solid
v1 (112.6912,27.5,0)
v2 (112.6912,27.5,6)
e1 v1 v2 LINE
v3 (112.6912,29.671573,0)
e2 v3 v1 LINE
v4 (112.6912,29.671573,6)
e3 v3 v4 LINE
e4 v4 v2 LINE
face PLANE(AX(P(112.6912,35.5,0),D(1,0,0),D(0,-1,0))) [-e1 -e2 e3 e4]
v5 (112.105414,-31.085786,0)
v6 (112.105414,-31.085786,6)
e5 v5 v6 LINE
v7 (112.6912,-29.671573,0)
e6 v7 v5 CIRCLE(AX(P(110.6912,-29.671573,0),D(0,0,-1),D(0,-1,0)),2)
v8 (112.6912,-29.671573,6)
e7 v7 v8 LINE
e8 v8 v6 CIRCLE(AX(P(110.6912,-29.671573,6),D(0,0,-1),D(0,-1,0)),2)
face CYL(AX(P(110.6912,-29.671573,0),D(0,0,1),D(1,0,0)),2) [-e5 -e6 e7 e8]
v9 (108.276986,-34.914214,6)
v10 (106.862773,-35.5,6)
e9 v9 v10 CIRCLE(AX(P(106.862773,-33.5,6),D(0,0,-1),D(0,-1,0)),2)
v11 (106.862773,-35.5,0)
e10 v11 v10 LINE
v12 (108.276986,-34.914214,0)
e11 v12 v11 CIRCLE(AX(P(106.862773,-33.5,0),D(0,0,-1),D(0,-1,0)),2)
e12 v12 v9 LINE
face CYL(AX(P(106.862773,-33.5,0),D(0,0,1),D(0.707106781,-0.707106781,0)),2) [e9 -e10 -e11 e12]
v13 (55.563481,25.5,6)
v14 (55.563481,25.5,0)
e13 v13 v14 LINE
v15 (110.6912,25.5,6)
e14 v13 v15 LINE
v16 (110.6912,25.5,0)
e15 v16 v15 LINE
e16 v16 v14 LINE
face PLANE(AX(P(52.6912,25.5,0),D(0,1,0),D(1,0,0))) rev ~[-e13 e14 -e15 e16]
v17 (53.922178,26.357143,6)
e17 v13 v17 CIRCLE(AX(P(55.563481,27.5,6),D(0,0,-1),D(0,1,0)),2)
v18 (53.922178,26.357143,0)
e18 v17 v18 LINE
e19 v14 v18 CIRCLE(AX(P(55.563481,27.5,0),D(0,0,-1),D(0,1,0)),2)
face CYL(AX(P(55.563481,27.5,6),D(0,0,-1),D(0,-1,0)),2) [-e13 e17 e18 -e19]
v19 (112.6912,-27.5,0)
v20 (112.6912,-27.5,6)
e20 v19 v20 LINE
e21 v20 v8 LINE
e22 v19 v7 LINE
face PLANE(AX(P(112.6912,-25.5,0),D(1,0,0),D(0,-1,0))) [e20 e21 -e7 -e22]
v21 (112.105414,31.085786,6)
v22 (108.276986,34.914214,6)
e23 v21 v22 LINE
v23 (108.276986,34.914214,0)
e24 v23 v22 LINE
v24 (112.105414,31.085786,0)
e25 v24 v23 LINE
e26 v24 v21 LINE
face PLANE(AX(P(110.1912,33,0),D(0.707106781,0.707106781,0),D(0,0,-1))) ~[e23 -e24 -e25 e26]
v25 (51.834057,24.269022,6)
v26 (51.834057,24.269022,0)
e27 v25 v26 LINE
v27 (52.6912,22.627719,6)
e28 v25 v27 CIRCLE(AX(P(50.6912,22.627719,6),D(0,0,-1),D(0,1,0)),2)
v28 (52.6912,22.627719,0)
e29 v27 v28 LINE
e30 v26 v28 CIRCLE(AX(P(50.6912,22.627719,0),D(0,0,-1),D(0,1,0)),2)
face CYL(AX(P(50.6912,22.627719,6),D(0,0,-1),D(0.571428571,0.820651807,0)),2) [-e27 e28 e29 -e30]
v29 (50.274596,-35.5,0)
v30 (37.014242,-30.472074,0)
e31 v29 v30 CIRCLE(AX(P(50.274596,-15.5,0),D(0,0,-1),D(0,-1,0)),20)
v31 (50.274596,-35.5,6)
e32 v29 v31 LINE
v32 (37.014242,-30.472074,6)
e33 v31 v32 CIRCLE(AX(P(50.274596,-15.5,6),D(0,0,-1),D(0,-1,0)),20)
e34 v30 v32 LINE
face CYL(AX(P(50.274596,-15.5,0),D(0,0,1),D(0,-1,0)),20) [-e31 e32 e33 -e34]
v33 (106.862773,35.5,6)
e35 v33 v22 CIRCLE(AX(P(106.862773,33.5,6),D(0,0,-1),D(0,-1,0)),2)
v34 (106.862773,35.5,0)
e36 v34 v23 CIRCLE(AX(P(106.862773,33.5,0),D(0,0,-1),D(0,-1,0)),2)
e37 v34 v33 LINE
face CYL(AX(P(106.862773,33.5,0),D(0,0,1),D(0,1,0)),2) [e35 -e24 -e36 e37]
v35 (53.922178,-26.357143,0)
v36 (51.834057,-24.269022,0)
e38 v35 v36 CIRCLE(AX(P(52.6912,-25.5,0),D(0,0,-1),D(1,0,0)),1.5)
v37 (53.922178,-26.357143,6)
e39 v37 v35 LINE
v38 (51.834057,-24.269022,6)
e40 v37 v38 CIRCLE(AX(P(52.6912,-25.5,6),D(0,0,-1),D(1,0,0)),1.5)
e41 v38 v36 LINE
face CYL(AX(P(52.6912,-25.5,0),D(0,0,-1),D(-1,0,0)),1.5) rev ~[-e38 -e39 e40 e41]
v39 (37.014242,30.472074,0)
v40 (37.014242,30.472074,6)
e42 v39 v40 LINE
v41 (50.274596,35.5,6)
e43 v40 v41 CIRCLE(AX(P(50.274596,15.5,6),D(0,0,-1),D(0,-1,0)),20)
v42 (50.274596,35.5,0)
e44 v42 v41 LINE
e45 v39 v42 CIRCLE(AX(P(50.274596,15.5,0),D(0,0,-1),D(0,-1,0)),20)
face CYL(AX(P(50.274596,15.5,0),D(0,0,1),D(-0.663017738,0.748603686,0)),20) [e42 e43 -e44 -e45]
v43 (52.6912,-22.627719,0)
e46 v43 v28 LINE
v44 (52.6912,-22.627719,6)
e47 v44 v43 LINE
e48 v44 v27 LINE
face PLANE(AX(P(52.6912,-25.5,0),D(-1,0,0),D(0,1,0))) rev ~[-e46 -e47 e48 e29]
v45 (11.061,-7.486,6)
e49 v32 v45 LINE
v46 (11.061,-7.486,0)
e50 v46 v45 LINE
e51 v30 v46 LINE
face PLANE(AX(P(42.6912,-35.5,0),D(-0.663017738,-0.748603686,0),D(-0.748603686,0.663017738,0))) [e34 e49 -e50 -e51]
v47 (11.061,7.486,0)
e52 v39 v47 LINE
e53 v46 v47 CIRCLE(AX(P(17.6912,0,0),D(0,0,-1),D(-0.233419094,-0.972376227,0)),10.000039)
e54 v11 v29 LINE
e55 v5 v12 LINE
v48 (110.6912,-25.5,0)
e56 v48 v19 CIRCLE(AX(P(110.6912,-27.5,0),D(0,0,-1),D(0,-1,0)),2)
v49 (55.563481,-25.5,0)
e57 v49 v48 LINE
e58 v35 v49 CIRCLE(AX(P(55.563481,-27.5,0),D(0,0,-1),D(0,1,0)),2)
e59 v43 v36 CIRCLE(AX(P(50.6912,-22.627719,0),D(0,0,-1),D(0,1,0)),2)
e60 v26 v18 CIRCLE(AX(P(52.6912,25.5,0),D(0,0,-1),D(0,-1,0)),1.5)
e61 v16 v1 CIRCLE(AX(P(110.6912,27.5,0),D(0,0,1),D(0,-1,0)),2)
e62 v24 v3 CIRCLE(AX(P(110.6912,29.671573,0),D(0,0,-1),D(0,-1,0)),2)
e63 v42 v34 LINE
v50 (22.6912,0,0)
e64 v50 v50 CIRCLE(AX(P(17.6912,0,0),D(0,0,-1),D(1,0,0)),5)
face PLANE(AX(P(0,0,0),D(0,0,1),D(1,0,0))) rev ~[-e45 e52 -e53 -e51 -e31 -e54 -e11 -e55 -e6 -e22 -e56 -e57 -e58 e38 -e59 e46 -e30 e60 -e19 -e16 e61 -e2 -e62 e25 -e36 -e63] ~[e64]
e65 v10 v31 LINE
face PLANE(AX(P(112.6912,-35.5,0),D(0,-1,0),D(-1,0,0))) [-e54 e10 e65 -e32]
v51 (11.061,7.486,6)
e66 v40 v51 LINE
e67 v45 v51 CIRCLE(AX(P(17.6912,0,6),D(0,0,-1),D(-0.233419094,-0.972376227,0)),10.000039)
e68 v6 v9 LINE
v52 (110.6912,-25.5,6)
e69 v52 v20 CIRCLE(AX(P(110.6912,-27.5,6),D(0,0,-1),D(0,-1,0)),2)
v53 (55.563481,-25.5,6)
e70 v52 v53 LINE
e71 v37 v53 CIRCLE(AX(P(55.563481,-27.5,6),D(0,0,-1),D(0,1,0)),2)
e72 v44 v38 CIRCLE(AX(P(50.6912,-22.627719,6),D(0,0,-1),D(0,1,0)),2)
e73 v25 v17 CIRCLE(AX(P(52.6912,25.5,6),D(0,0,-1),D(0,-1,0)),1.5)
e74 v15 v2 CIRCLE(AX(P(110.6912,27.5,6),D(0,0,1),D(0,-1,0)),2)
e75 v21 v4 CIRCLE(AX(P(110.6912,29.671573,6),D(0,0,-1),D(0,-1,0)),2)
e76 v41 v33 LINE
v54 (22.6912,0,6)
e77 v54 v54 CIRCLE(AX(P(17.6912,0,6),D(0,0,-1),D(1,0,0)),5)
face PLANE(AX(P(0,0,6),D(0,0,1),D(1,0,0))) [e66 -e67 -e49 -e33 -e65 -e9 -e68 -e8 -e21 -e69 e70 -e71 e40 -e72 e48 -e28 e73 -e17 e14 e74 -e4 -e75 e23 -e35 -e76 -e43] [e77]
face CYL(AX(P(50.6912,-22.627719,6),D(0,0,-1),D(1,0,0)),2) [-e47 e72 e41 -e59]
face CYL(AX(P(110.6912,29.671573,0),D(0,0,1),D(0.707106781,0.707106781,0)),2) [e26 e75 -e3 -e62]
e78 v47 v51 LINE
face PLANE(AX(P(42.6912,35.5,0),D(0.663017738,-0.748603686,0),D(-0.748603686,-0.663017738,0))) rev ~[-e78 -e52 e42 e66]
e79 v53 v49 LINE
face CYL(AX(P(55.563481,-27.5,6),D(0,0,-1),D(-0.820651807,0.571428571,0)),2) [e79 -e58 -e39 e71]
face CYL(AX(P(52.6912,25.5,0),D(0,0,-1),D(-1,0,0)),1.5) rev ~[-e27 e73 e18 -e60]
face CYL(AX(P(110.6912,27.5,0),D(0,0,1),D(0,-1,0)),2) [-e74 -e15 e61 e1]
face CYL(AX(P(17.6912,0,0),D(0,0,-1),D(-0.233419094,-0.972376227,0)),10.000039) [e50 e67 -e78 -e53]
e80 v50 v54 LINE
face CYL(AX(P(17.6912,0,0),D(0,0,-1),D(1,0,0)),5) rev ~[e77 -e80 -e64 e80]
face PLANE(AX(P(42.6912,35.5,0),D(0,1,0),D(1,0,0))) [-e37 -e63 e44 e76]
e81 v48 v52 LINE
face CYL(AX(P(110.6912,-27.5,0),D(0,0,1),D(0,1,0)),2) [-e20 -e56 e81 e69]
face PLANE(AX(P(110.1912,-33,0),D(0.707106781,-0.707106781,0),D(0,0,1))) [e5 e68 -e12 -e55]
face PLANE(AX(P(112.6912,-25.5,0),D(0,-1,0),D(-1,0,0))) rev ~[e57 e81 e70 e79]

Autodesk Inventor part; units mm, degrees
ref_plane "YZ Plane" through (0, 0, 0) normal (1, 0, 0) x (0, 1, 0)
ref_plane "XZ Plane" through (0, 0, 0) normal (0, 1, 0) x (-1, 0, 0)
ref_plane "XY Plane" through (0, 0, 0) normal (0, 0, 1) x (1, 0, 0)
sketch "Sketch1" plane through (0, 0, 0) normal (0, 0, 1) x (1, 0, 0)
  circle A0 centre (-790.1228, -10.9134) radius 9.525 projected
  ellipse E0 centre (61.5218, 18.65) end of major axis (52.5416, 18.65) minor radius 6.35 (61.5218, 25) -> (52.5416, 18.65) ccw
  line L0 (61.5218, 25) -> (114.272, 25)
  ellipse E1 centre (114.272, 18.65) end of major axis (105.2917, 18.65) minor radius 6.35 (123.2522, 18.65) -> (114.272, 25) ccw
  line L1 (123.2522, 18.65) -> (123.2522, -18.65)
  ellipse E2 centre (114.272, -18.65) end of major axis (105.2917, -18.65) minor radius 6.35 (114.272, -25) -> (123.2522, -18.65) ccw
  line L2 (114.272, -25) -> (61.5218, -25)
  ellipse E3 centre (61.5218, -18.65) end of major axis (52.5416, -18.65) minor radius 6.35 (52.5416, -18.65) -> (61.5218, -25) ccw
  line L3 (52.5416, -18.65) -> (52.5416, 18.65)
  line L4 (114.272, 21.825) -> (61.5218, 21.825)
  ellipse E4 centre (61.5218, 18.65) end of major axis (57.0317, 18.65) minor radius 3.175 (61.5218, 21.825) -> (57.0317, 18.65) ccw
  line L5 (57.0317, 18.65) -> (57.0317, -18.65)
  ellipse E5 centre (61.5218, -18.65) end of major axis (57.0317, -18.65) minor radius 3.175 (57.0317, -18.65) -> (61.5218, -21.825) ccw
  line L6 (61.5218, -21.825) -> (114.272, -21.825)
  ellipse E6 centre (114.272, -18.65) end of major axis (109.7818, -18.65) minor radius 3.175 (114.272, -21.825) -> (118.7621, -18.65) ccw
  line L7 (118.7621, -18.65) -> (118.7621, 18.65)
  ellipse E7 centre (114.272, 18.65) end of major axis (109.7818, 18.65) minor radius 3.175 (118.7621, 18.65) -> (114.272, 21.825) ccw
  circle A1 centre (17.6912, 0) radius 5 projected
  circle A2 centre (17.6912, 0) radius 10
  line L8 (15.357, 9.7238) -> (52.5416, 18.65)
  line L9 (52.5416, -18.65) -> (15.357, -9.7238)
  dimension "d4" = 20
extrude "Extrusion1" add sketch "Sketch1" along normal blind 6 contours L3 L9 A2 L8 | A2
chamfer "Chamfer1" distance 5 angle 45 1 edges at (52.5416, 0, 6)
thicken "Thicken1" operation add thickness 3 both sides no extend neighbours yes toward (-0.7071068, 0, -0.7071068) faces at (50.8749, 5.8166, 2.6667)
sketch "Sketch2" plane through (0, 0, 0) normal (0, 0, -1) x (-1, 0, 0)
  line L0 (-49.2989, -17.8716) -> (-49.2989, 17.8716) projected
  line L1 (-15.357, -9.7238) -> (-49.2989, -17.8716) projected
  arc A0 (-15.357, -9.7238) -> (-15.357, 9.7238) centre (-17.6912, 0) ccw projected
  line L2 (-49.2989, 17.8716) -> (-15.357, 9.7238) projected
  circle A1 centre (-17.6912, 0) radius 5 projected
  line L3 (-112.6912, -35.5) -> (-42.6912, -35.5)
  line L4 (-42.6912, -35.5) -> (-42.6912, 35.5)
  line L5 (-42.6912, 35.5) -> (-112.6912, 35.5)
  line L6 (-112.6912, -35.5) -> (-42.6912, 35.5) construction
  line L7 (-42.6912, -35.5) -> (-112.6912, 35.5) construction
  line L8 (-42.6912, 35.5) -> (-11.061, 7.486)
  arc A2 (-15.357, -9.7238) -> (-15.357, 9.7238) centre (-17.6912, 0) ccw projected
  line L9 (-42.6912, -35.5) -> (-11.061, -7.486)
  line L10 (-102.6912, -25.5) -> (-52.6912, -25.5)
  line L11 (-52.6912, -25.5) -> (-52.6912, 25.5)
  line L12 (-52.6912, 25.5) -> (-102.6912, 25.5)
  line L13 (-102.6912, -25.5) -> (-52.6912, 25.5) construction
  line L14 (-52.6912, -25.5) -> (-102.6912, 25.5) construction
  line L15 (-102.6912, 25.5) -> (-112.6912, 25.5)
  line L16 (-112.6912, -25.5) -> (-102.6912, -25.5)
  line L17 (-112.6912, 35.5) -> (-112.6912, 25.5)
  line L18 (-112.6912, -25.5) -> (-112.6912, -35.5)
  line L19 (-49.2989, -17.8716) -> (-49.2989, 17.8716) projected
  point P0 (0, 0)
  point P1 (-77.6912, 0)
  point P2 (-49.2989, 0)
  point P3 (-77.6912, 0)
  point P4 (-11.061, -7.486)
  point P5 (-11.061, 7.486)
  point P6 (-49.2989, 0)
  point P7 (-52.6912, 0)
  dimension "d13" = 51
  dimension "d14" = 35
  dimension "d15" = 10
  dimension "d16" = 50
  dimension "d17" = 10
  dimension "d30" = 71
extrude "Extrusion2" add sketch "Sketch2" against normal up to surface (6 mm away)
chamfer "Chamfer2" distance 5 angle 45 2 edges at (112.6912, 35.5, 3) (112.6912, -35.5, 3)
sketch "Sketch3" plane through (0, 0, 0) normal (0, 0, -1) x (-1, 0, 0)
  line L0 (-107.6912, -35.5) -> (-112.6912, -30.5) projected
  line L1 (-107.6912, -35.5) -> (-42.6912, -35.5) projected
  line L2 (-42.6912, -35.5) -> (-11.061, -7.486) projected
  arc A0 (-11.061, -7.486) -> (-11.061, 7.486) centre (-17.6912, 0) ccw projected
  line L3 (-11.061, 7.486) -> (-42.6912, 35.5) projected
  line L4 (-42.6912, 35.5) -> (-107.6912, 35.5) projected
  line L5 (-112.6912, 30.5) -> (-107.6912, 35.5) projected
  line L6 (-112.6912, 30.5) -> (-112.6912, 25.5) projected
  line L7 (-112.6912, 25.5) -> (-52.6912, 25.5) projected
  line L8 (-52.6912, 25.5) -> (-52.6912, -25.5) projected
  line L9 (-52.6912, -25.5) -> (-112.6912, -25.5) projected
  line L10 (-112.6912, -25.5) -> (-112.6912, -30.5) projected
  circle A1 centre (-17.6912, 0) radius 5 projected
  line L11 (-52.6912, 25.5) -> (-52.6912, -25.5) projected
  circle A2 centre (-52.6912, 25.5) radius 1.5
  circle A3 centre (-52.6912, -25.5) radius 1.5
  point P0 (0, 0)
  dimension "d23" = 3
  dimension "d24" = 3
extrude "Extrusion3" cut sketch "Sketch3" against normal through all contours A3 L8 L9 | L9 L8 A3 | A2 L7 L8 | L8 L7 A2
fillet "Fillet1" radius 2 4 edges at (52.6912, -24, 3) (54.1912, -25.5, 3) (54.1912, 25.5, 3) (52.6912, 24, 3)
fillet "Fillet2" radius 2 6 edges at (107.6912, -35.5, 3) (112.6912, -30.5, 3) (107.6912, 35.5, 3) (112.6912, 30.5, 3) (112.6912, 25.5, 3) (112.6912, -25.5, 3)
fillet "Fillet3" radius 20 2 edges at (42.6912, 35.5, 3) (42.6912, -35.5, 3)
properties part number "FRC003-1"
